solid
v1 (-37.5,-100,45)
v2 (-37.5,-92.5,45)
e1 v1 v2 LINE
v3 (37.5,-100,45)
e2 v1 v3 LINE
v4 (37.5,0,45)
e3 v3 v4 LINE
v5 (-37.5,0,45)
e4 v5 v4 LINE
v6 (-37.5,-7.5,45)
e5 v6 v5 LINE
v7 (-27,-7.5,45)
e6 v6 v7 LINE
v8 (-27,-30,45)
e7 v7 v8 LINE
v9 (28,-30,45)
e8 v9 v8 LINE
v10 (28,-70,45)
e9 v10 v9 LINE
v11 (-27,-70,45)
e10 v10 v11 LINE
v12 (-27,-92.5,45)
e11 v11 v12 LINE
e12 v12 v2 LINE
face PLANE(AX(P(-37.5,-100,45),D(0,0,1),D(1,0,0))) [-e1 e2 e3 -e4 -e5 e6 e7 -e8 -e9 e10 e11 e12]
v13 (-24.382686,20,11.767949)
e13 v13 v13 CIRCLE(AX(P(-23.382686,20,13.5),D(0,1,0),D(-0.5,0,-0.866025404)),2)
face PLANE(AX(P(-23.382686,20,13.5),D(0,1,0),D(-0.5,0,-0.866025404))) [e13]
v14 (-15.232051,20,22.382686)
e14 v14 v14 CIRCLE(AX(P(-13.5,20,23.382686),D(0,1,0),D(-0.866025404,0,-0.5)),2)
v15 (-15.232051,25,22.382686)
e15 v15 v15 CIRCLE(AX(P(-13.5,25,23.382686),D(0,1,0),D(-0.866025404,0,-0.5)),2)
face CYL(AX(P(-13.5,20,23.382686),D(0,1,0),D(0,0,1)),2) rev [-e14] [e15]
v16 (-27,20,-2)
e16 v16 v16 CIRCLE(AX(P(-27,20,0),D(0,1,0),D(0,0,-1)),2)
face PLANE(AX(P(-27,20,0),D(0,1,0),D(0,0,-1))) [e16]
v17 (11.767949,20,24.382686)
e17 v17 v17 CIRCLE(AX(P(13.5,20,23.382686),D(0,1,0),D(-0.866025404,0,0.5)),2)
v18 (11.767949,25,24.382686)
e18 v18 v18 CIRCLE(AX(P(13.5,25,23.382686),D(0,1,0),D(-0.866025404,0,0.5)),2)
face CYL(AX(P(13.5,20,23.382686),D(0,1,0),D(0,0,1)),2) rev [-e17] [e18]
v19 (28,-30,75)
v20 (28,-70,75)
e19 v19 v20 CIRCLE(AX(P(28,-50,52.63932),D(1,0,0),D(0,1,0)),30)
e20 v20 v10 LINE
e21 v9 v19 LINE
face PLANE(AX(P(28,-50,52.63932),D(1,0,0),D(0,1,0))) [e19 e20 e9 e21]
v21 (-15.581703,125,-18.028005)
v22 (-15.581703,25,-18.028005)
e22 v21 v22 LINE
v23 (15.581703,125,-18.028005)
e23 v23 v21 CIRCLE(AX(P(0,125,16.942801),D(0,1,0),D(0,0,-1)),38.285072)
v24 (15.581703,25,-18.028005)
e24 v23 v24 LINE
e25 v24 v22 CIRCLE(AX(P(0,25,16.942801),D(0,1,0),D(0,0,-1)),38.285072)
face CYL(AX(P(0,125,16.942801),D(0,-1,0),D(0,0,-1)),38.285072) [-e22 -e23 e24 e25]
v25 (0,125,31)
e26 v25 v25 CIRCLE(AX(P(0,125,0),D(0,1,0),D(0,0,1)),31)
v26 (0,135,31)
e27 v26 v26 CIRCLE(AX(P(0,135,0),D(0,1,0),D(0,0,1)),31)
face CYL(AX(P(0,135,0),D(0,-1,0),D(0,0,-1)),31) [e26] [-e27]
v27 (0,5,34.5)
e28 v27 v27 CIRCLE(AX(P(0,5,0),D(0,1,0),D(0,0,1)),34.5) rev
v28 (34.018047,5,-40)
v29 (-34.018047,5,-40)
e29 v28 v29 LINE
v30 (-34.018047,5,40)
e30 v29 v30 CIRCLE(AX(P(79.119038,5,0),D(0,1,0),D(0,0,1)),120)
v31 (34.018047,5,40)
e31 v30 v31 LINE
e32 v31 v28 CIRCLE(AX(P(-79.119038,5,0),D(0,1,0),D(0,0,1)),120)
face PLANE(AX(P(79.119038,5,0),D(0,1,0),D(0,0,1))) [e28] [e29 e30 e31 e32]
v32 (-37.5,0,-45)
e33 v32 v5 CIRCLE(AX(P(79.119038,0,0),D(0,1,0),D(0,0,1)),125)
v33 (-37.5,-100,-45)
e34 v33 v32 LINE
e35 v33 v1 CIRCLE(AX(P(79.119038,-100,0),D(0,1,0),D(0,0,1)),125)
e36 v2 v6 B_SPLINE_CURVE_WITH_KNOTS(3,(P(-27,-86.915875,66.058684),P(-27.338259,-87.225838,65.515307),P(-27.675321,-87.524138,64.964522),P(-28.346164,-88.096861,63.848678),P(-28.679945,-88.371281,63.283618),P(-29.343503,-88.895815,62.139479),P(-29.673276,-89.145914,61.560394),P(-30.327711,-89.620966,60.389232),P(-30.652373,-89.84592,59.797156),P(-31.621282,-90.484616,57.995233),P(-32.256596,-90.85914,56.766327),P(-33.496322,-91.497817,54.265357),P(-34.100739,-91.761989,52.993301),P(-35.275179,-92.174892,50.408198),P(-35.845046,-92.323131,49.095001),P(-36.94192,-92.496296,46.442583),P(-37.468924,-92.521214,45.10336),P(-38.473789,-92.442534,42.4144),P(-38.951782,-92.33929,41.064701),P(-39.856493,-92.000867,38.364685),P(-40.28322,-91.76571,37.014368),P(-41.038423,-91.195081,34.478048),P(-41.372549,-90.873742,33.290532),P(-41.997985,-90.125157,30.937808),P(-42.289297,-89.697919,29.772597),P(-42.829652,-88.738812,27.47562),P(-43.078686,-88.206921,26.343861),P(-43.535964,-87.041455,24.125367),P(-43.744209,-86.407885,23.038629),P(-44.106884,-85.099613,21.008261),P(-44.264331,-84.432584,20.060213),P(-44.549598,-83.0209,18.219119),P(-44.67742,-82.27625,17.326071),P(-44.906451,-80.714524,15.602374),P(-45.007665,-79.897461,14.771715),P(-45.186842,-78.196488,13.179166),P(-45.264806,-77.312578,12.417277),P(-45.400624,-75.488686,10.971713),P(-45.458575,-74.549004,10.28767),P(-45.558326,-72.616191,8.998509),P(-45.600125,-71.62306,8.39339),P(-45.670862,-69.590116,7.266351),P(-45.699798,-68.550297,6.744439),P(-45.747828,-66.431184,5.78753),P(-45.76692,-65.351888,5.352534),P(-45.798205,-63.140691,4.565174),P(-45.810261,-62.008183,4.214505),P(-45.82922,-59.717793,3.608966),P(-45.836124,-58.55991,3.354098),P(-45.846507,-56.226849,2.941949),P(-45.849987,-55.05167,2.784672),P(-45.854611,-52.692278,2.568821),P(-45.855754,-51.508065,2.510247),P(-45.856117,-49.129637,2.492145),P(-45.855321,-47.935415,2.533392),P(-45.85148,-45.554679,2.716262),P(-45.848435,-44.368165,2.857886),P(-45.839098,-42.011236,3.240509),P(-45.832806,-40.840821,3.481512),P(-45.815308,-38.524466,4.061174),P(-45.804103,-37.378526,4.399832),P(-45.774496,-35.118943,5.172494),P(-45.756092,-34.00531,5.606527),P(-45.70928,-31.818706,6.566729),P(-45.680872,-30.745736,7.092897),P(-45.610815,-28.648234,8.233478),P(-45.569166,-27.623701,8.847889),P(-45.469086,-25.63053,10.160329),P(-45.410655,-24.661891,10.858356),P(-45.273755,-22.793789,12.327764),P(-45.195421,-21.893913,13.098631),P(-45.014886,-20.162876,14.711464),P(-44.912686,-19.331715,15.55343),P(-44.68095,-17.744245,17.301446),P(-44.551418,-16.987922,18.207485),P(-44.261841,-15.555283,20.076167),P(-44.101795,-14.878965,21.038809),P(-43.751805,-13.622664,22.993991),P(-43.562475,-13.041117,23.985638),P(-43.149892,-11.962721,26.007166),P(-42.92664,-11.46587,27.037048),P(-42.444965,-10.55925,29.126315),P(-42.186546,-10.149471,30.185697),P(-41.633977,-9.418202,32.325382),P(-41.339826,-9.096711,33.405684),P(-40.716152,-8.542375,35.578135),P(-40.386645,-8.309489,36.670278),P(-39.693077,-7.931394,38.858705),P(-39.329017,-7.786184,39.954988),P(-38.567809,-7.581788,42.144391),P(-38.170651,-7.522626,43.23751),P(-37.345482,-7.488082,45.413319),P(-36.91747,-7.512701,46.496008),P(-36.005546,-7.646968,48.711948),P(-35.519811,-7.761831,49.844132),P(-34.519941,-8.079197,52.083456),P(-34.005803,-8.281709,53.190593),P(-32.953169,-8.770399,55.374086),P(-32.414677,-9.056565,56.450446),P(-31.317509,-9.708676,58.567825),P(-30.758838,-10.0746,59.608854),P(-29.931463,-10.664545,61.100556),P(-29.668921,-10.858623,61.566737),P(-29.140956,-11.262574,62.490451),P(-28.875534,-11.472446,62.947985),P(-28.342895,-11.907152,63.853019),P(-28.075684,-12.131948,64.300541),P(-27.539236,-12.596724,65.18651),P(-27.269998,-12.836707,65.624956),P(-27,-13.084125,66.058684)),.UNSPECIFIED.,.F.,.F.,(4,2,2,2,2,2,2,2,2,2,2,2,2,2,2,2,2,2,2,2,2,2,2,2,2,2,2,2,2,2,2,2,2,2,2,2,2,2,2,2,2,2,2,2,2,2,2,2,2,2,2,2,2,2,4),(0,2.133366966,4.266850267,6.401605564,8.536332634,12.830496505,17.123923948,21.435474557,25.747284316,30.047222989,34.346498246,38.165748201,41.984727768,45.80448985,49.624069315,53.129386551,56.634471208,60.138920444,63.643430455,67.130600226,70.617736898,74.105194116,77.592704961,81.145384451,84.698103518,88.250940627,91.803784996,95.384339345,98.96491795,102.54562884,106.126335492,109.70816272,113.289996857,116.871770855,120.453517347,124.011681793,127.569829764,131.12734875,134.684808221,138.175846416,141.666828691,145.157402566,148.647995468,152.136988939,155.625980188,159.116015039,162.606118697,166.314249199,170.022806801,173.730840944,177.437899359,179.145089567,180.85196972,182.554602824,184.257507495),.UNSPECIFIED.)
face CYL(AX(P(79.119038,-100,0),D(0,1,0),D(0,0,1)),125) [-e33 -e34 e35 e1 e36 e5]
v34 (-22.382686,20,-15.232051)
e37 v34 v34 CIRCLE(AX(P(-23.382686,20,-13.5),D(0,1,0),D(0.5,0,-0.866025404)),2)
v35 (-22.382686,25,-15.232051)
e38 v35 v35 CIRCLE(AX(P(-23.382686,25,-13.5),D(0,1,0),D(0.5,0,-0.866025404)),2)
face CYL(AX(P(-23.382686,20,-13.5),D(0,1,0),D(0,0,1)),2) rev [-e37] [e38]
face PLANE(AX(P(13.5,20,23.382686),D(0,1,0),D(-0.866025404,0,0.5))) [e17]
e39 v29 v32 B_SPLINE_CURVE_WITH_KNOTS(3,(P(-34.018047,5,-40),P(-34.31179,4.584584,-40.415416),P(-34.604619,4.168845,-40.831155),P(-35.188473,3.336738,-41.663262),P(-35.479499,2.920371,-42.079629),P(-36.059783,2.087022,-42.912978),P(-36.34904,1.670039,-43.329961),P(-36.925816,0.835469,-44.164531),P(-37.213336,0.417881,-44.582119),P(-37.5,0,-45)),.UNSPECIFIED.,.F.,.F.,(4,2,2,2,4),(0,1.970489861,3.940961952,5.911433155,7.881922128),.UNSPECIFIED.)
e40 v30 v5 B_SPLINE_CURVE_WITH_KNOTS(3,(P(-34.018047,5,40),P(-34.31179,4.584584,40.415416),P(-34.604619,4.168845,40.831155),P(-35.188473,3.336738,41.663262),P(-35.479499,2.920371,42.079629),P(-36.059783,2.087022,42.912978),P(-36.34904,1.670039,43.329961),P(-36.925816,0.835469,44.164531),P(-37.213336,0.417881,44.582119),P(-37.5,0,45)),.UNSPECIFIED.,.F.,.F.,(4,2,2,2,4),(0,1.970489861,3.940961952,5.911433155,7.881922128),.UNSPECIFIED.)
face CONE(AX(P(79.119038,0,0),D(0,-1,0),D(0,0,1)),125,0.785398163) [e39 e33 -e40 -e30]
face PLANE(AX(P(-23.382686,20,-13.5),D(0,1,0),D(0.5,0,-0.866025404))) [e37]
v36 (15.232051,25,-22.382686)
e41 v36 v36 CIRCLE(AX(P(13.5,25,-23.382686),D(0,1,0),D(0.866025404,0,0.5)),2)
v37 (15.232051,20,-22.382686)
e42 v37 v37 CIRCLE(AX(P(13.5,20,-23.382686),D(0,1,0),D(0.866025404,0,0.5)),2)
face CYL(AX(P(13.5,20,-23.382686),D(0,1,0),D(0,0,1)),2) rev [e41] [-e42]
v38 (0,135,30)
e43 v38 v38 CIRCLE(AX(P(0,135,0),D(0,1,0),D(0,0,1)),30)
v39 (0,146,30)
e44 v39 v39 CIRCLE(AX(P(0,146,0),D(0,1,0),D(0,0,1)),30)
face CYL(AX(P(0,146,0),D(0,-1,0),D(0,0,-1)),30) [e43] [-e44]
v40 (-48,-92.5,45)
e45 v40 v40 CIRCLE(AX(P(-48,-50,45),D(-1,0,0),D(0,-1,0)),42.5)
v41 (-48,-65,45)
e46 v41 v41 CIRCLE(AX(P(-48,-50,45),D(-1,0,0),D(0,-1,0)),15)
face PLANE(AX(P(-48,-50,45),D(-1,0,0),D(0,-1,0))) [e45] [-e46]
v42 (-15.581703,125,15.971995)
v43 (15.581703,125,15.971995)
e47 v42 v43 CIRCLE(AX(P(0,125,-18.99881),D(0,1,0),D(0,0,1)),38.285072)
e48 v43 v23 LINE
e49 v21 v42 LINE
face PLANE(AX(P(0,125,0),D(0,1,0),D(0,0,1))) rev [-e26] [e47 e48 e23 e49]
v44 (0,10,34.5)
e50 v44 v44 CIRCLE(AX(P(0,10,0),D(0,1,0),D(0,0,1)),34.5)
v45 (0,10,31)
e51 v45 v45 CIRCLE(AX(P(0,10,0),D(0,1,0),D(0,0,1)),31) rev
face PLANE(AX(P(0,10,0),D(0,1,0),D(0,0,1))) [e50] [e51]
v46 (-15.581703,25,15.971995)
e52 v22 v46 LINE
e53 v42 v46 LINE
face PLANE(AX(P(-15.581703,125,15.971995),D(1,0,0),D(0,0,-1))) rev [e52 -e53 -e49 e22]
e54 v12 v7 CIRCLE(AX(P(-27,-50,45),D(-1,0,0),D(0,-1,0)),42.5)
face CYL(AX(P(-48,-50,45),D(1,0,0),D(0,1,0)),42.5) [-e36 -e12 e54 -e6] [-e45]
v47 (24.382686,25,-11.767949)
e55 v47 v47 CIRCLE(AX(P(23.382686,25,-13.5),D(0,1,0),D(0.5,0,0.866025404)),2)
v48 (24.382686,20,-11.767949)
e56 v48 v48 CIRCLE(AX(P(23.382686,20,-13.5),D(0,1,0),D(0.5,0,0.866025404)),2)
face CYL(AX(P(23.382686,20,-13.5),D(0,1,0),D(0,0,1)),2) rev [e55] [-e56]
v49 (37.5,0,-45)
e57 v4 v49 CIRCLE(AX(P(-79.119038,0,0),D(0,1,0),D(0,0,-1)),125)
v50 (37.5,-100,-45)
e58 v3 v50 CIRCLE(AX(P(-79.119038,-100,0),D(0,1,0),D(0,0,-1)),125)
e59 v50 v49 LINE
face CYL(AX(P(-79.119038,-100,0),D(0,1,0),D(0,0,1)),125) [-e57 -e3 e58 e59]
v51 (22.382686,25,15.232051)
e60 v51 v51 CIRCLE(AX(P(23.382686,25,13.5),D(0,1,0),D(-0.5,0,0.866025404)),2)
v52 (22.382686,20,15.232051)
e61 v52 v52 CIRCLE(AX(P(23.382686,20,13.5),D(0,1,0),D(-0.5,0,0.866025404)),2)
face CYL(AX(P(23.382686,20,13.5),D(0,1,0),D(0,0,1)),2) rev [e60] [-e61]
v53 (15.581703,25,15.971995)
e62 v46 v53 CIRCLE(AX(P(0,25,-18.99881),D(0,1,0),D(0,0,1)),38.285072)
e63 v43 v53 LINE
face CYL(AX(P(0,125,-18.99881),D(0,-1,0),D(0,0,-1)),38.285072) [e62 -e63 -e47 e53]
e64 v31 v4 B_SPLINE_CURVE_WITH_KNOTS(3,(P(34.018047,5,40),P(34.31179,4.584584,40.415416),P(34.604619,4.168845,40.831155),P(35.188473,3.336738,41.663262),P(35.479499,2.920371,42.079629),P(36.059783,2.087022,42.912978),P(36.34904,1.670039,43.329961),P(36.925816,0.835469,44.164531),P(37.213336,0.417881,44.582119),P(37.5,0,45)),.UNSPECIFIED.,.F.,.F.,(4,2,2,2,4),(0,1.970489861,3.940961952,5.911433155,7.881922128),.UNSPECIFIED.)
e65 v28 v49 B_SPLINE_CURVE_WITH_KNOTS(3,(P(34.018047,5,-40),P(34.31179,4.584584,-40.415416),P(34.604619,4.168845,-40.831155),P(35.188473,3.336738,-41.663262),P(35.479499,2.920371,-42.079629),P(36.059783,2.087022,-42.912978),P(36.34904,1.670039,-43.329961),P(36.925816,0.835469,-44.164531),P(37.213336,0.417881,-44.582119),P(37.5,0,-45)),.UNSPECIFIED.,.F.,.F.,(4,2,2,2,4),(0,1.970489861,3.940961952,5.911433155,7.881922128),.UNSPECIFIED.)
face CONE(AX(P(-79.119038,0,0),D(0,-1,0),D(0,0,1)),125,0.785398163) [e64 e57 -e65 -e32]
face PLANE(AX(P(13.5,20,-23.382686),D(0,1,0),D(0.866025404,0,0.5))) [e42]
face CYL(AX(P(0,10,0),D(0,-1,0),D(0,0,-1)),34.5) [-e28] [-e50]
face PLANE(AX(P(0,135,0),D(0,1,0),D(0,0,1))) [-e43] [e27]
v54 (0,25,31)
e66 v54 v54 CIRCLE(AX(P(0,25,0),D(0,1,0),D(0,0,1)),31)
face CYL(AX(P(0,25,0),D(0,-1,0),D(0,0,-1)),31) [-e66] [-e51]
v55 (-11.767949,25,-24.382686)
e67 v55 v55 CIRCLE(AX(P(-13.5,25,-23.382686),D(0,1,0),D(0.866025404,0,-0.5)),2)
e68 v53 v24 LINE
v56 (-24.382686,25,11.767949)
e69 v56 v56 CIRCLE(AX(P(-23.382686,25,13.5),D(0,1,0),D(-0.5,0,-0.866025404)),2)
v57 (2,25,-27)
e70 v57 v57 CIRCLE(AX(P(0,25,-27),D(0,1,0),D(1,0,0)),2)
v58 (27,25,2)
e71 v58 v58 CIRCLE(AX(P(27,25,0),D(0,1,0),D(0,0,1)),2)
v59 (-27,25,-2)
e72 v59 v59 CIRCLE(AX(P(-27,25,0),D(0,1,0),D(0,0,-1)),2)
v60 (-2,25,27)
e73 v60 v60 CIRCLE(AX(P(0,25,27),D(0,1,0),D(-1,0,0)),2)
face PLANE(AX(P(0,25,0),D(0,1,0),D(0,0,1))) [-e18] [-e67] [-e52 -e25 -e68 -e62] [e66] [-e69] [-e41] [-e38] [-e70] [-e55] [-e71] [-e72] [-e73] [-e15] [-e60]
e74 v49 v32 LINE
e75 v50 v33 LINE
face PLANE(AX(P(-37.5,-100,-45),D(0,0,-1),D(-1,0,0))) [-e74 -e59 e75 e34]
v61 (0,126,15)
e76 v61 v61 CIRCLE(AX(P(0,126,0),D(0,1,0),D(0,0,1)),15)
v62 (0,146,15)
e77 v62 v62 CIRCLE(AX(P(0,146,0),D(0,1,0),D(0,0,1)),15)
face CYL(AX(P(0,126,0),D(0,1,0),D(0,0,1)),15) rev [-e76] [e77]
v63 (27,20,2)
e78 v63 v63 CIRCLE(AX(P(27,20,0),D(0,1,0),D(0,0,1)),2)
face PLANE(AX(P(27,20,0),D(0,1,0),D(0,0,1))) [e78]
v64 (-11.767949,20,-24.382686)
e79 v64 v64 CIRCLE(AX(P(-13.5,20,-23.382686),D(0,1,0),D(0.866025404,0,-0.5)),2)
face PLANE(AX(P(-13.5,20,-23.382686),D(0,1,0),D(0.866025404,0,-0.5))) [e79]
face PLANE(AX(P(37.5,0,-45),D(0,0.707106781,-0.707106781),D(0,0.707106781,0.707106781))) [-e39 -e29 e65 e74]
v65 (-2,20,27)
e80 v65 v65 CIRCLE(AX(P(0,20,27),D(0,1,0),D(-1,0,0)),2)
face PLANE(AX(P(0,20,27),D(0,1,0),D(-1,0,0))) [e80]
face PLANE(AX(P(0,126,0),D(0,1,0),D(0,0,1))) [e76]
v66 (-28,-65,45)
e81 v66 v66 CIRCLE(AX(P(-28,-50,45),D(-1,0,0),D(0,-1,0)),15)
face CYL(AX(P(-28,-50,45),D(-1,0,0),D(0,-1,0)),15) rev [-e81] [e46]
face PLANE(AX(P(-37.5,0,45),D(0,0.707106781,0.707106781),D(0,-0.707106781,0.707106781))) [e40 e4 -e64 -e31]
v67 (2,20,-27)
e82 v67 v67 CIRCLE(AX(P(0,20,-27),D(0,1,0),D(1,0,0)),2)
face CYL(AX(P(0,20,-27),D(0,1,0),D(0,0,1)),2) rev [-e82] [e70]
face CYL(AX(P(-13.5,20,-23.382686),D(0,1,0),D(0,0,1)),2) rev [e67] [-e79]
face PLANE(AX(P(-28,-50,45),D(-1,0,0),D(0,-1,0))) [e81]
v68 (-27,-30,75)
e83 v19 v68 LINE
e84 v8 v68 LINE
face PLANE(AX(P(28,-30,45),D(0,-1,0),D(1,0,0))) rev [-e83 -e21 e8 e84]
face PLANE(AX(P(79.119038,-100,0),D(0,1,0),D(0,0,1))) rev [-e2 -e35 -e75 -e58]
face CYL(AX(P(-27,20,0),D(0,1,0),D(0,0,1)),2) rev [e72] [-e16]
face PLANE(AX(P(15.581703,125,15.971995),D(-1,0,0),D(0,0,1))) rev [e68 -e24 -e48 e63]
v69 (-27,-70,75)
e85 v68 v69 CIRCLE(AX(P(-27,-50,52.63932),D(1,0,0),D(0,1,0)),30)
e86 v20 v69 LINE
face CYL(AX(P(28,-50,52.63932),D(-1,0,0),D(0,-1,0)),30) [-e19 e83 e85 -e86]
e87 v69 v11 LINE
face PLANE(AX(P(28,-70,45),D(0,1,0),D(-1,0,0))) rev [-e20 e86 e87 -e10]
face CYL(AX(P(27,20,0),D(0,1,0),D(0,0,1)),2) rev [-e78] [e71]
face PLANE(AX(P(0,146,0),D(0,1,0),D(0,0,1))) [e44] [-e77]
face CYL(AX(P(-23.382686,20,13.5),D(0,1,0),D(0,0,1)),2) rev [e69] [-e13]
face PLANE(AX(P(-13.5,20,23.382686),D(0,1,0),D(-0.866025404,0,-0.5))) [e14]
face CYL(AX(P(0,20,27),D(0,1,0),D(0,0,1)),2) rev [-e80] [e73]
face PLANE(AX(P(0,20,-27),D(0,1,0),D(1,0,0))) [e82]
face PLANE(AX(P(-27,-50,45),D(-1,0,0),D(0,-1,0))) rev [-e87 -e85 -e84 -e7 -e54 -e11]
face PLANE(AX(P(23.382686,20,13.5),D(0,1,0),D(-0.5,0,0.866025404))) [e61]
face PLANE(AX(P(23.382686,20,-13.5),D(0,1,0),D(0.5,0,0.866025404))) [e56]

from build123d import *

# Parameters (mm, degrees)
Y_KSEKLIK_EKSTR_ZYON1_DEPTH = 100
Y_KSEKLIK_EKSTR_ZYON2_DEPTH = 5
Y_KSEKLIK_EKSTR_ZYON2_DRAFT = 45
IZIM6_R                     = 34.5
Y_KSEKLIK_EKSTR_ZYON3_DEPTH = 5
IZIM7_R                     = 31
Y_KSEKLIK_EKSTR_ZYON4_DEPTH = 15
IZIM8_R                     = 2
KES_EKSTR_ZYON1_DEPTH       = 5
DAIRESEL_KAPLAMA1_COUNT     = 12
Y_KSEKLIK_EKSTR_ZYON5_DEPTH = 100
Y_KSEKLIK_EKSTR_ZYON6_START = 10
IZIM11_R                    = 31
Y_KSEKLIK_EKSTR_ZYON6_DEPTH = 10
IZIM12_R                    = 30
Y_KSEKLIK_EKSTR_ZYON7_DEPTH = 11
IZIM13_R                    = 42.5
Y_KSEKLIK_EKSTR_ZYON8_DEPTH = 10.5
Y_KSEKLIK_EKSTR_ZYON9_DEPTH = 55
IZIM17_R                    = 15
KES_EKSTR_ZYON2_DEPTH       = 20
IZIM18_R                    = 15
KES_EKSTR_ZYON3_DEPTH       = 20


# Read off the part's stored shape, not the designer's step: Yükseklik-Ekstrüzyon2
with BuildPart() as part:
    # Çizim1 → Yükseklik-Ekstrüzyon1 (new body)
    with BuildSketch(Plane(origin=(0, 0, 0), x_dir=(1, 0, 0), z_dir=(0, 1, 0))):
        with BuildLine():
            Line((-37.5, 45), (37.5, 45))
            ThreePointArc((37.5, 45), (45.880962103, 0), (37.5, -45))
            Line((37.5, -45), (-37.5, -45))
            ThreePointArc((-37.5, -45), (-45.880962103, 0), (-37.5, 45))
        make_face()
    extrude(amount=-Y_KSEKLIK_EKSTR_ZYON1_DEPTH)


with BuildPart() as y_kseklik_ekstr_zyon2_tool:
    # Yükseklik-Ekstrüzyon2 outline → Yükseklik-Ekstrüzyon2 (with draft: the straight prism first)
    with BuildSketch(Plane(origin=(0, 5, 0), x_dir=(1, 0, 0), z_dir=(0, 1, 0))):
        with BuildLine():
            ThreePointArc((-34.018047093, 40), (-40.880962103, 0), (-34.018047093, -40))
            Line((-34.018047093, -40), (34.018047093, -40))
            ThreePointArc((34.018047093, -40), (40.880962103, 0), (34.018047093, 40))
            Line((34.018047093, 40), (-34.018047093, 40))
        make_face()
    extrude(amount=-Y_KSEKLIK_EKSTR_ZYON2_DEPTH)
    # Yükseklik-Ekstrüzyon2: the draft: its side faces are tilted about the plane it starts from
    y_kseklik_ekstr_zyon2_sides = [y_kseklik_ekstr_zyon2_tool.faces().sort_by_distance(p)[0] for p in [
        (0, 2.5, -40),
        (-40.880962103, 2.5, 0),
        (0, 2.5, 40),
        (40.880962103, 2.5, 0),
    ]]
    draft(y_kseklik_ekstr_zyon2_sides, Plane(origin=(0, 5, 0), x_dir=(1, 0, 0), z_dir=(0, 1, 0)), Y_KSEKLIK_EKSTR_ZYON2_DRAFT)


with BuildPart() as part_1:
    add(part.part)

    # Yükseklik-Ekstrüzyon2: add y_kseklik_ekstr_zyon2_tool
    add(y_kseklik_ekstr_zyon2_tool.part)

    # Çizim6 → Yükseklik-Ekstrüzyon3 (add, symmetric)
    with BuildSketch(Plane(origin=(0, 5, 0), x_dir=(1, 0, 0), z_dir=(0, 1, 0))):
        with Locations(Location((0, 0, 0), (0, 0, 270))):
            Circle(IZIM6_R)
    extrude(amount=Y_KSEKLIK_EKSTR_ZYON3_DEPTH, both=True)

    # Çizim7 → Yükseklik-Ekstrüzyon4 (add, symmetric)
    with BuildSketch(Plane(origin=(0, 10, 0), x_dir=(1, 0, 0), z_dir=(0, 1, 0))):
        with Locations(Location((0, 0, 0), (0, 0, 270))):
            Circle(IZIM7_R)
    extrude(amount=Y_KSEKLIK_EKSTR_ZYON4_DEPTH, both=True)

    # Çizim8 → Kes-Ekstrüzyon1 (cut)
    with BuildSketch(Plane(origin=(0, 25, 0), x_dir=(1, 0, 0), z_dir=(0, 1, 0))):
        with Locations(Location((27, 0, 0), (0, 0, 270))):
            Circle(IZIM8_R)
    kes_ekstr_zyon1 = extrude(amount=-KES_EKSTR_ZYON1_DEPTH, mode=Mode.SUBTRACT)

    # Dairesel Kaplama1: Kes-Ekstrüzyon1 ×12 about axis
    dairesel_kaplama1_axis = Axis((0, 0, 0), (0, 1, 0))
    for i in range(1, DAIRESEL_KAPLAMA1_COUNT):
        add(kes_ekstr_zyon1.rotate(dairesel_kaplama1_axis, i * 360 / DAIRESEL_KAPLAMA1_COUNT), mode=Mode.SUBTRACT)

    # Çizim10 → Yükseklik-Ekstrüzyon5 (add)
    with BuildSketch(Plane(origin=(0, 25, 0), x_dir=(1, 0, 0), z_dir=(0, 1, 0))):
        with BuildLine():
            Line((-15.581702618, -15.971995333), (-15.581702618, 18.028004667))
            ThreePointArc((-15.581702618, 18.028004667), (0, 21.342270575), (15.581702618, 18.028004667))
            Line((15.581702618, 18.028004667), (15.581702618, -15.971995333))
            ThreePointArc((15.581702618, -15.971995333), (0, -19.28626124), (-15.581702618, -15.971995333))
        make_face()
    extrude(amount=Y_KSEKLIK_EKSTR_ZYON5_DEPTH)

    # Çizim11 → Yükseklik-Ekstrüzyon6 (add)
    with BuildSketch(Plane(origin=(0, 125, 0), x_dir=(1, 0, 0), z_dir=(0, 1, 0)).offset(Y_KSEKLIK_EKSTR_ZYON6_START)):
        with Locations(Location((0, 0, 0), (0, 0, 270))):
            Circle(IZIM11_R)
    extrude(amount=-Y_KSEKLIK_EKSTR_ZYON6_DEPTH)

    # Çizim12 → Yükseklik-Ekstrüzyon7 (add)
    with BuildSketch(Plane(origin=(0, 135, 0), x_dir=(1, 0, 0), z_dir=(0, 1, 0))):
        with Locations(Location((0, 0, 0), (0, 0, 270))):
            Circle(IZIM12_R)
    extrude(amount=Y_KSEKLIK_EKSTR_ZYON7_DEPTH)

    # Çizim13 → Yükseklik-Ekstrüzyon8 (add, symmetric)
    with BuildSketch(Plane.ZY.offset(37.5)):
        with Locations(Location((45, -50, 0), (0, 0, 270))):
            Circle(IZIM13_R)
    extrude(amount=Y_KSEKLIK_EKSTR_ZYON8_DEPTH, both=True)

    # Çizim16 → Yükseklik-Ekstrüzyon9 (add)
    with BuildSketch(Plane(origin=(-27, 0, 0), x_dir=(0, 0, -1), z_dir=(1, 0, 0))):
        with BuildLine():
            Line((-45, -30), (-45, -70))
            Line((-45, -70), (-75, -70))
            ThreePointArc((-75, -70), (-82.639320225, -50), (-75, -30))
            Line((-75, -30), (-45, -30))
        make_face()
    extrude(amount=Y_KSEKLIK_EKSTR_ZYON9_DEPTH)

    # Çizim17 → Kes-Ekstrüzyon2 (cut)
    with BuildSketch(Plane(origin=(0, 146, 0), x_dir=(1, 0, 0), z_dir=(0, 1, 0))):
        with Locations(Location((0, 0, 0), (0, 0, 270))):
            Circle(IZIM17_R)
    extrude(amount=-KES_EKSTR_ZYON2_DEPTH, mode=Mode.SUBTRACT)

    # Çizim18 → Kes-Ekstrüzyon3 (cut)
    with BuildSketch(Plane.ZY.offset(48)):
        with Locations(Location((45, -50, 0), (0, 0, 270))):
            Circle(IZIM18_R)
    extrude(amount=-KES_EKSTR_ZYON3_DEPTH, mode=Mode.SUBTRACT)


solid = part_1.part
